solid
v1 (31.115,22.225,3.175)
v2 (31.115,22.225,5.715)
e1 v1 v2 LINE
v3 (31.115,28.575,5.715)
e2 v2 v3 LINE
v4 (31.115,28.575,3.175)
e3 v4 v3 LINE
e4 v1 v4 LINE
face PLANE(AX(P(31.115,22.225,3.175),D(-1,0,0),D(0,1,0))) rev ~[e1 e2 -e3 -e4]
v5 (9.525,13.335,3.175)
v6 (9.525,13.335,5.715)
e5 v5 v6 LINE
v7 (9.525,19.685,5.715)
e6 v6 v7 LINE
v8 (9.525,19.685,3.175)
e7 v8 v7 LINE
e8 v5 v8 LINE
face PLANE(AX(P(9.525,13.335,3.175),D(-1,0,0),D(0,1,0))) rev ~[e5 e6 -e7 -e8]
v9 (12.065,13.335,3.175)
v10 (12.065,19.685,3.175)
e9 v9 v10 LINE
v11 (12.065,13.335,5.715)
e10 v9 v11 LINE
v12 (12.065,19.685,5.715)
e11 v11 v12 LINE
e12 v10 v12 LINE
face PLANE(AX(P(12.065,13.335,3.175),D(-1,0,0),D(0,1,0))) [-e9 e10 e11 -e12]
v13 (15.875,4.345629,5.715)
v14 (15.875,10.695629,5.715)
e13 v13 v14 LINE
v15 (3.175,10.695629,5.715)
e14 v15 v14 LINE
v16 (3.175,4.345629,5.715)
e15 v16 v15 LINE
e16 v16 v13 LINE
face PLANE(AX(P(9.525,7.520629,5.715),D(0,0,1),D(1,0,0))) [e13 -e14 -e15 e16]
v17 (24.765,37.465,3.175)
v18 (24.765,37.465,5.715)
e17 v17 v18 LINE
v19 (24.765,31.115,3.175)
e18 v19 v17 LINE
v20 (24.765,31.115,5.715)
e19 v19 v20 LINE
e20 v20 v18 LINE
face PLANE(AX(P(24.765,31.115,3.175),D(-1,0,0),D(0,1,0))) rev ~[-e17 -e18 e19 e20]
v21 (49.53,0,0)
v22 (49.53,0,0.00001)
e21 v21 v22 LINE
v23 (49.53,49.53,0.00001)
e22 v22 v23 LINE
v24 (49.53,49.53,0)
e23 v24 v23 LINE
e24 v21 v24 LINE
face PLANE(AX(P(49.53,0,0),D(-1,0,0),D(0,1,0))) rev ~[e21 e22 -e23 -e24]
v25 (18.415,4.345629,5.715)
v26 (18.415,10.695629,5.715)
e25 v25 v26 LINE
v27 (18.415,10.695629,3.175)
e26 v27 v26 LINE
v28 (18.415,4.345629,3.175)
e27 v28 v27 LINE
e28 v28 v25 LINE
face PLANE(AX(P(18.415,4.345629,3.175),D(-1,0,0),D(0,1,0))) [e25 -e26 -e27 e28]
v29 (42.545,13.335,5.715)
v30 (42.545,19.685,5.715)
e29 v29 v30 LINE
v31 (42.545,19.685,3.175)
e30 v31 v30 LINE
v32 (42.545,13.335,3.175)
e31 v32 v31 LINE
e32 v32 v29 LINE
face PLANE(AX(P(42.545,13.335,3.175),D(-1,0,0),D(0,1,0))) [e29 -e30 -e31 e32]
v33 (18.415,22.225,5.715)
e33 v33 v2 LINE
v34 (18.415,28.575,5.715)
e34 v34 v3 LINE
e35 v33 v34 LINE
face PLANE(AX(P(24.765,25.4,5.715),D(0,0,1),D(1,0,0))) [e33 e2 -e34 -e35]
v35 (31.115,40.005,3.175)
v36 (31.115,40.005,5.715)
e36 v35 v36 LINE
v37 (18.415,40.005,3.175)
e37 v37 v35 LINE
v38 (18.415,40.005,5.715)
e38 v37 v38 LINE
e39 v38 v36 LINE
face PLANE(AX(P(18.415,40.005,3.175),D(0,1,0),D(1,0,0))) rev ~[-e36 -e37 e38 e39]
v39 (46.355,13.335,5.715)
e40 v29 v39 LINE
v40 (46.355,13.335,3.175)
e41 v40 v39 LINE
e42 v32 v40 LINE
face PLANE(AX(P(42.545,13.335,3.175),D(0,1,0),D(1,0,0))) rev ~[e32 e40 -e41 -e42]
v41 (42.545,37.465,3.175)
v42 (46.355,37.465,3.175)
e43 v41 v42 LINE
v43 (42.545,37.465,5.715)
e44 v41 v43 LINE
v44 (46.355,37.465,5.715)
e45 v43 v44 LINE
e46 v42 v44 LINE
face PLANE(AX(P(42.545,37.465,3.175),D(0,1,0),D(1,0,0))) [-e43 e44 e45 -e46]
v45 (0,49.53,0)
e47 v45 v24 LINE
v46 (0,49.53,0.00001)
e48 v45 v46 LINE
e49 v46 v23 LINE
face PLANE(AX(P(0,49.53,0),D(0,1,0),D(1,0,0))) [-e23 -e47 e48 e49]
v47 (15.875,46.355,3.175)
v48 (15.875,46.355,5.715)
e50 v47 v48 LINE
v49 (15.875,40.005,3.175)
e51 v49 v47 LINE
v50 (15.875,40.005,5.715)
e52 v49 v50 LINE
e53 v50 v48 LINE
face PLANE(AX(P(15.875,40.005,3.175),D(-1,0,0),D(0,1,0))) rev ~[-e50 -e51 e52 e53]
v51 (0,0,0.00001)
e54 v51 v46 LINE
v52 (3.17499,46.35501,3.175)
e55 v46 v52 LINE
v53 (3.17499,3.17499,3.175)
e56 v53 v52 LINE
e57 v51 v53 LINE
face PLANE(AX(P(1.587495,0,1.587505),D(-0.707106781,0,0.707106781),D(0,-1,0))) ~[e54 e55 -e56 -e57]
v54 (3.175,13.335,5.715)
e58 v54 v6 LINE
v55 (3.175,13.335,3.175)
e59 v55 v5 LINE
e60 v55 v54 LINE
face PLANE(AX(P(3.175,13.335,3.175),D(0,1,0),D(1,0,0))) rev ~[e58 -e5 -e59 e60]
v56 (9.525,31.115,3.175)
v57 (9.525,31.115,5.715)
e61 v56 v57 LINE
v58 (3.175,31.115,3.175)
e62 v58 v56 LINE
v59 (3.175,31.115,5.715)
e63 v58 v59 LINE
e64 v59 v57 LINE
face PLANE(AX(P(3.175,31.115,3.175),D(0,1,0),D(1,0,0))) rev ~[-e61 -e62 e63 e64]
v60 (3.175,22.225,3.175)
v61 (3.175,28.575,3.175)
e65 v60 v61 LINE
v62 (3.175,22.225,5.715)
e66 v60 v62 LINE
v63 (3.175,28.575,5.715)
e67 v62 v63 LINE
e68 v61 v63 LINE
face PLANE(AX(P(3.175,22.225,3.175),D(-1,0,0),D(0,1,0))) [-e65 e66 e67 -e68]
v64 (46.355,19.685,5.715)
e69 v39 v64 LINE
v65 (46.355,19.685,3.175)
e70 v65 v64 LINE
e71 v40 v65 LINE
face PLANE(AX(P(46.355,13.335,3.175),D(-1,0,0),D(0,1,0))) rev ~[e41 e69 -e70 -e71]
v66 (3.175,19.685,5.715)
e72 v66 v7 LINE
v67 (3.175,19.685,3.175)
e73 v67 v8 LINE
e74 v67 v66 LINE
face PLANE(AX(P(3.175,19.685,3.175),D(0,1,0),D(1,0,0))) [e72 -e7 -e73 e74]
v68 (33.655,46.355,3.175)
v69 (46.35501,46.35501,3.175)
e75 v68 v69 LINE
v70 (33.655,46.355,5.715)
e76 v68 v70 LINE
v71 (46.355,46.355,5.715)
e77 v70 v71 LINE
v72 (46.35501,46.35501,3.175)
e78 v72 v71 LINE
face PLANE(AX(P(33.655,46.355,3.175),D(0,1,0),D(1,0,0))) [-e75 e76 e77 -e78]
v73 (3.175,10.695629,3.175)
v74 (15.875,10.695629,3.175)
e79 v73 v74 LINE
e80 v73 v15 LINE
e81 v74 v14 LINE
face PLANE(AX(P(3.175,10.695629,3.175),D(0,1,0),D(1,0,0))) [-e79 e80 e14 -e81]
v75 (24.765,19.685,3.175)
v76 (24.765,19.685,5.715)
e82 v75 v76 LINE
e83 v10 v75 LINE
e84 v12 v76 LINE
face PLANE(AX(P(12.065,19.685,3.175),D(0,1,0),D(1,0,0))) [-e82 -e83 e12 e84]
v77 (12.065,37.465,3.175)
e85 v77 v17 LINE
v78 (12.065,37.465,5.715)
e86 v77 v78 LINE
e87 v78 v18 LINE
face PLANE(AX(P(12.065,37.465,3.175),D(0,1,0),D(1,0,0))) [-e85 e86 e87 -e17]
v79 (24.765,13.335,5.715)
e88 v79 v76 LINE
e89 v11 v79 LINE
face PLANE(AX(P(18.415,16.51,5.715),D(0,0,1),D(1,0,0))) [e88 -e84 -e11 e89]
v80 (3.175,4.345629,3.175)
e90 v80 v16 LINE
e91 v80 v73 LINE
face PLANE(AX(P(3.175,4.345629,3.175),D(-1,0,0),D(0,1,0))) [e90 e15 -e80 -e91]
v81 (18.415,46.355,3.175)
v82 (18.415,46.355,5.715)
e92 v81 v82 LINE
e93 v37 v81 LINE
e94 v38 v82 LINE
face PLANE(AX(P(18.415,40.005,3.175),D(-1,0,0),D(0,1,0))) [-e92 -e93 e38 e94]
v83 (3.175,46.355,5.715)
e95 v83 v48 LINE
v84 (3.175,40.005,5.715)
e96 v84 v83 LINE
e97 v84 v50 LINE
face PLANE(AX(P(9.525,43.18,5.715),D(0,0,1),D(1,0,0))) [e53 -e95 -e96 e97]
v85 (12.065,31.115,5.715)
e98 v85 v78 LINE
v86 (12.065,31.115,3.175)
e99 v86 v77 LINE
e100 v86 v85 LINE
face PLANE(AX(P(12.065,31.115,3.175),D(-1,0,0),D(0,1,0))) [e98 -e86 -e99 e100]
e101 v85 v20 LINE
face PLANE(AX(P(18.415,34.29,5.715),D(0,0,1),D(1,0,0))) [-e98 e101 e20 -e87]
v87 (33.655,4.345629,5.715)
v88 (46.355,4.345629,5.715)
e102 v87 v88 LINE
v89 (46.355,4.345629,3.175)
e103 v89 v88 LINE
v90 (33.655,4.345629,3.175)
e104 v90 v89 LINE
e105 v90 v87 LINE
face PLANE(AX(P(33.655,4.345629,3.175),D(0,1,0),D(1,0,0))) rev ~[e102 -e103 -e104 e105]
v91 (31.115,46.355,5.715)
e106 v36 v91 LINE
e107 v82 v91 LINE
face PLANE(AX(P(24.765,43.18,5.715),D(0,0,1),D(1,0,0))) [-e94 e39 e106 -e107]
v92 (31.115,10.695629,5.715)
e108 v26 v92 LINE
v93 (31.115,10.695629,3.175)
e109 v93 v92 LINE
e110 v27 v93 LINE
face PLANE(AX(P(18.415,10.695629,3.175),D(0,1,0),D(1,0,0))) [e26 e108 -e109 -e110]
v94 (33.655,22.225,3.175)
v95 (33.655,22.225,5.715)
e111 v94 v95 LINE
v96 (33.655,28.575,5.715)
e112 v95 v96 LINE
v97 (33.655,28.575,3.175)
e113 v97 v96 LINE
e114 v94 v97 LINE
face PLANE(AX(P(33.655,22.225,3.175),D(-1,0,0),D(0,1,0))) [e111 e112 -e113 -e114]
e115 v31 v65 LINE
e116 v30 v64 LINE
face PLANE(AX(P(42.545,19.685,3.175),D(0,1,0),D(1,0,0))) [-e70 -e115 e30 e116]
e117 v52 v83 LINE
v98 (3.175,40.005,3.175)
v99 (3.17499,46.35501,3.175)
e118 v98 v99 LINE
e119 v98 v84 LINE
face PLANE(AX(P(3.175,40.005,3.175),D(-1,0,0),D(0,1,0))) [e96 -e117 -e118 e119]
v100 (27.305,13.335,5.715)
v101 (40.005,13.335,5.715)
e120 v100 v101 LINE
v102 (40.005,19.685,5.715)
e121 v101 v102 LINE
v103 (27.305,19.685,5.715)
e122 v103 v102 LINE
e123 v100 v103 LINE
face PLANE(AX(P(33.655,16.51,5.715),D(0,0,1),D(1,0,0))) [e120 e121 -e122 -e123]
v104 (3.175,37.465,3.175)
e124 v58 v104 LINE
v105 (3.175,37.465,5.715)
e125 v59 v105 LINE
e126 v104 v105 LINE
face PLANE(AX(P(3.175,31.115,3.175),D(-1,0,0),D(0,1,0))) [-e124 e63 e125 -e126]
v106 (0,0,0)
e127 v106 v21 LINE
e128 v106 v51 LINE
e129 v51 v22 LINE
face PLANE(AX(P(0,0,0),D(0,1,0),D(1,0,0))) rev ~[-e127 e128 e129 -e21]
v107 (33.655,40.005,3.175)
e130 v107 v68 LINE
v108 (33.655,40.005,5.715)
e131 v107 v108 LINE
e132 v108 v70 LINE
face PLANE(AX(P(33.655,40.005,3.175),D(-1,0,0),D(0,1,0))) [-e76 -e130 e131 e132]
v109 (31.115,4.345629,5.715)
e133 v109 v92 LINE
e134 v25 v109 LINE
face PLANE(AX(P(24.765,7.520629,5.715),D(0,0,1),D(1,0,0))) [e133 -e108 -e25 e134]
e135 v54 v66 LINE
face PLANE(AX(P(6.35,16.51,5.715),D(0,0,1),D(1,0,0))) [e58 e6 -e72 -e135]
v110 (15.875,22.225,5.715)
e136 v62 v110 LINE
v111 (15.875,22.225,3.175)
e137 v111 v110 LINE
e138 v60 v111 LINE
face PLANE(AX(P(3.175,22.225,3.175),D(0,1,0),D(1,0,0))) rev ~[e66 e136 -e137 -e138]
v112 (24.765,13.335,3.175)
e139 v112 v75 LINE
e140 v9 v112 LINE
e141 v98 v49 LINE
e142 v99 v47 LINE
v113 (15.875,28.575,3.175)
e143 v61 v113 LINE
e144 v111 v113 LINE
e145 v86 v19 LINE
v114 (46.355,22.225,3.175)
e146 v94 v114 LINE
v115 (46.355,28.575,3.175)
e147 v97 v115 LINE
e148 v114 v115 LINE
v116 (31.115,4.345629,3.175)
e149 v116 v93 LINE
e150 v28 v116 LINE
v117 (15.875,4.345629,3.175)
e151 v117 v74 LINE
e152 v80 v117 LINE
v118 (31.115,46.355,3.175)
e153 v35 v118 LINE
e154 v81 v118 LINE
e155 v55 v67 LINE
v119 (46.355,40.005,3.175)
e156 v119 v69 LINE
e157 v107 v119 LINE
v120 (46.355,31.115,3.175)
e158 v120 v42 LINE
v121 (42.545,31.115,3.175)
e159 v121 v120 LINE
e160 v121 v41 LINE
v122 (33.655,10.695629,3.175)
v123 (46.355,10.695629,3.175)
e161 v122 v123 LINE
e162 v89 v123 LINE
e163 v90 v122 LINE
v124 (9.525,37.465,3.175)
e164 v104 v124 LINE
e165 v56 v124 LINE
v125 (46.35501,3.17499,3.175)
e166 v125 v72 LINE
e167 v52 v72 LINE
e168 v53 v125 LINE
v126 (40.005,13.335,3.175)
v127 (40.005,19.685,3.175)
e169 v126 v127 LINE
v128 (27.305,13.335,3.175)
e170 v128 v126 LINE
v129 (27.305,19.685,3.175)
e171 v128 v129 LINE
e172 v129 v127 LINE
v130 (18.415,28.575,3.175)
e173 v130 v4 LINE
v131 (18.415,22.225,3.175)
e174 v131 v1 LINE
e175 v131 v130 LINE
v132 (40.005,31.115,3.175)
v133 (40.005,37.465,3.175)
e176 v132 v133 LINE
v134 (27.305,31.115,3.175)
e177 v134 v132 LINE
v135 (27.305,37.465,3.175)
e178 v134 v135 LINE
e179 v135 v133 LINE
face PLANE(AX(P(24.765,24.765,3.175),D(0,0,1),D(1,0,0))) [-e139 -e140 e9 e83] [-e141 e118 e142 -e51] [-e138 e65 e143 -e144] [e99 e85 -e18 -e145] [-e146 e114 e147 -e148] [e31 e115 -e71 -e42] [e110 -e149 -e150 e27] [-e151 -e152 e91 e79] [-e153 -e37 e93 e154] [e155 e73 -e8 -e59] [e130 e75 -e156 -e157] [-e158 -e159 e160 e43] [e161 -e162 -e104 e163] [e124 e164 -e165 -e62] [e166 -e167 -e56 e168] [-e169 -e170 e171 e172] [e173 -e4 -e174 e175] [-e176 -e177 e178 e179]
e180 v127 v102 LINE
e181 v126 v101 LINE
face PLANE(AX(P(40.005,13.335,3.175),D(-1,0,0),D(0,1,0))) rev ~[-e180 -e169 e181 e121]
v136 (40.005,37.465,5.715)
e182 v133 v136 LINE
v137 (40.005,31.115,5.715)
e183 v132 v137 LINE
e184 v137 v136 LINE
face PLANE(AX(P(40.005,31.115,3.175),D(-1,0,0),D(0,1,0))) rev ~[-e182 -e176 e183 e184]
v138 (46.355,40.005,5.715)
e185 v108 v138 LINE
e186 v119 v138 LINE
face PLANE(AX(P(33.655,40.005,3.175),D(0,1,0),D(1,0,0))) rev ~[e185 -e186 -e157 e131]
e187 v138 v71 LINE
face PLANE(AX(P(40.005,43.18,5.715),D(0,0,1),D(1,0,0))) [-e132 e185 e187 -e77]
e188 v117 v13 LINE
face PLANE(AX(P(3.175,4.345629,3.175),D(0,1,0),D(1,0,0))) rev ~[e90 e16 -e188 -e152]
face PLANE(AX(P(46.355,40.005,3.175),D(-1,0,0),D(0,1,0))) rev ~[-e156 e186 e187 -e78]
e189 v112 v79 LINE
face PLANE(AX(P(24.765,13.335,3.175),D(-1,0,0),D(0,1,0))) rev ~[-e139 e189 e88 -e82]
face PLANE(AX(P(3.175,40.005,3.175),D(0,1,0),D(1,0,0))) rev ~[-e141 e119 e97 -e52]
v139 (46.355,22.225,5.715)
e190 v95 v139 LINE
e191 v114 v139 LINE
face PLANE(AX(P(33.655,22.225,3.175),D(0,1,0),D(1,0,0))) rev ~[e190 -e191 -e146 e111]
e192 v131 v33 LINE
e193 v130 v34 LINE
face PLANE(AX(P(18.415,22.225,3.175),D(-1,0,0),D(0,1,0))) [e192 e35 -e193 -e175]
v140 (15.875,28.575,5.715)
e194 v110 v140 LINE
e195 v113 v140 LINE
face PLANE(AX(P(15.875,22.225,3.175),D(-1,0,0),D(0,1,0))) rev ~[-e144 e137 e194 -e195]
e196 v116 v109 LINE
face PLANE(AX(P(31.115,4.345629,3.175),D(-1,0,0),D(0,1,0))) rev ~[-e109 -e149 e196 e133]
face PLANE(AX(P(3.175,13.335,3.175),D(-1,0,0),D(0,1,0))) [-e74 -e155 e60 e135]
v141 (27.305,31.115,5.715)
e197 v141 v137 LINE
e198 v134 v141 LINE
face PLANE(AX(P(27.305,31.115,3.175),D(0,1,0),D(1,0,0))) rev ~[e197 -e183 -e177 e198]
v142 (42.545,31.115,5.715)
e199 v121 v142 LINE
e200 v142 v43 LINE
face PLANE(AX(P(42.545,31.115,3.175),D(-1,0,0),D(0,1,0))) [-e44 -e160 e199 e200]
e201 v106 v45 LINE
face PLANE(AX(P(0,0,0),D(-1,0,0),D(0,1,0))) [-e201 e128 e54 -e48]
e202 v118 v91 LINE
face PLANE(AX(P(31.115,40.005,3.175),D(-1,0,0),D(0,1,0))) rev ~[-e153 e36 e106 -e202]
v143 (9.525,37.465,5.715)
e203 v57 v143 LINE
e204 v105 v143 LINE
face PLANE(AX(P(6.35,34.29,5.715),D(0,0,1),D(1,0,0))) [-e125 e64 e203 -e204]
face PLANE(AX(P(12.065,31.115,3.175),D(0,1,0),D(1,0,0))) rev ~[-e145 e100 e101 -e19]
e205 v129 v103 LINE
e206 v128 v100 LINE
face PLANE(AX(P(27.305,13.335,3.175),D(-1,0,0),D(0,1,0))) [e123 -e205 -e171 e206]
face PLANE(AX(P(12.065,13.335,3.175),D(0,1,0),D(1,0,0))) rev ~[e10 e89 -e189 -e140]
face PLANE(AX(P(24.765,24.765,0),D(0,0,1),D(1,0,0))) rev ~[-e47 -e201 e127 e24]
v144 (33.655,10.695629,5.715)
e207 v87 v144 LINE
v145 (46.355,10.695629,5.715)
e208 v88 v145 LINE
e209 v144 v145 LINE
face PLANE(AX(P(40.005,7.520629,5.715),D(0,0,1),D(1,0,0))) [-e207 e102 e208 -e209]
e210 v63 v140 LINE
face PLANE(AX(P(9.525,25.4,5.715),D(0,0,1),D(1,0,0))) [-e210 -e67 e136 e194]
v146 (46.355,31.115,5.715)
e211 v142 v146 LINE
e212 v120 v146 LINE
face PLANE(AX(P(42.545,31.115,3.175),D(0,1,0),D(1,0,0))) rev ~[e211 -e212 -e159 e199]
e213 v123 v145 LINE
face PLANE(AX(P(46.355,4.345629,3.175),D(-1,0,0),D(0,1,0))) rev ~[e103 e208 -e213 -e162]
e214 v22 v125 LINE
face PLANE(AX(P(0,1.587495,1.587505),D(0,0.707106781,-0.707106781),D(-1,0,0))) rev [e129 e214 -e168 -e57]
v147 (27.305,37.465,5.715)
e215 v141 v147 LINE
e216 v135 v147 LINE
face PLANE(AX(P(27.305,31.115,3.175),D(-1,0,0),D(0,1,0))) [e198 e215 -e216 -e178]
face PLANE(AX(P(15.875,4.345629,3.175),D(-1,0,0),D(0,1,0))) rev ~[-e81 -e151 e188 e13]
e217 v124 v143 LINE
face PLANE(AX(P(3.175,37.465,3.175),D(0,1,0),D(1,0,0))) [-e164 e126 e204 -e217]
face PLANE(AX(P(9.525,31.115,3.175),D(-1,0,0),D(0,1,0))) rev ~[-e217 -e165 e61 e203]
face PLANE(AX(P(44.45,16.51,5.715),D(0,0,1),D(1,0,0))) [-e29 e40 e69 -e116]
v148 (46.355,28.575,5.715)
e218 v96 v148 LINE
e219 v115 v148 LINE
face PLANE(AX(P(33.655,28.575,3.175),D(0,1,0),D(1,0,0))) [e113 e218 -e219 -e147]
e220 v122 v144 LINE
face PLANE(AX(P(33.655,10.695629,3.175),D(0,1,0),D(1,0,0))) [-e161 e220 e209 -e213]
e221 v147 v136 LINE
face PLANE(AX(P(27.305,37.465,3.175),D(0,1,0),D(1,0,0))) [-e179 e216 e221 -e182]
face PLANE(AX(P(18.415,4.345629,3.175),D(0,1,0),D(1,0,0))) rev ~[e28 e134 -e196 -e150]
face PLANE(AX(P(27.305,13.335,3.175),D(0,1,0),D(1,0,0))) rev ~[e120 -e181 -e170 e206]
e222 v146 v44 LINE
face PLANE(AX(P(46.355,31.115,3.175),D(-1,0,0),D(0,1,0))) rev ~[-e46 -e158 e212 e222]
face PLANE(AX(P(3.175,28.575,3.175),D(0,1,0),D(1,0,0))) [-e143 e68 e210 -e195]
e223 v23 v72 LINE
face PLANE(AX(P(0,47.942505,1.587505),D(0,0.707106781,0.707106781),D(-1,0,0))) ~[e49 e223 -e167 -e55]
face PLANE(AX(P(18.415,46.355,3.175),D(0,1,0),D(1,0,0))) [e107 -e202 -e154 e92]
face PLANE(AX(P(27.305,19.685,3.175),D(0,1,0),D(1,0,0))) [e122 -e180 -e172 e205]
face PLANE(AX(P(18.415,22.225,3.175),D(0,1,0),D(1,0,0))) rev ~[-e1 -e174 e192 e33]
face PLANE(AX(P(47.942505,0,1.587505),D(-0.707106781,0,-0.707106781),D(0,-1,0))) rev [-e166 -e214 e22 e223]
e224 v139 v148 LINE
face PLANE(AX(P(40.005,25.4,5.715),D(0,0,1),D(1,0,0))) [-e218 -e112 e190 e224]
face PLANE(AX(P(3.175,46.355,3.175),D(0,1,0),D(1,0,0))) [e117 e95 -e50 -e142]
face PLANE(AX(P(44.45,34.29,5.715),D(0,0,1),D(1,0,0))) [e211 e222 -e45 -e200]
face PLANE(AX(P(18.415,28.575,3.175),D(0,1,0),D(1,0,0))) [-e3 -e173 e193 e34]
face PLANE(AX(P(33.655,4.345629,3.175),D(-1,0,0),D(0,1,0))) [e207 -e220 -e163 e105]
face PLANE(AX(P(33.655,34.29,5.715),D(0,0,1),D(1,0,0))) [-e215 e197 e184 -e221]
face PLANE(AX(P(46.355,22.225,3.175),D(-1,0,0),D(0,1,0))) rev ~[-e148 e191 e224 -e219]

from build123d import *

# Parameters (mm, degrees)
F0_W     = 49.53
F0_H     = 49.53
F1_DEPTH = 3.175
F2_SIZE  = 3.17499
F3_W     = 3.81
F3_H     = 6.35
F3_W_2   = 12.7
F3_W_3   = 6.35
F3_W_4   = 12.7000000036
F3_W_5   = 3.8100000384
F3_W_6   = 12.7000000384
F4_DEPTH = 2.54


# Not quite as in the source:
# - a fillet or chamfer is up to 0.001 mm smaller than in the source, because OpenCascade refuses the exact size


with BuildPart() as f1:
    # F0 (on Top) → F1 (new body)
    with BuildSketch(Plane.XY):
        with Locations((24.765, 24.765)):
            Rectangle(F0_W, F0_H)
    extrude(amount=F1_DEPTH)

    # F2 (size 3.175 in the source; OpenCascade refuses exactly that, so slightly less here)
    f2_edges = [f1.edges().sort_by_distance(p)[0] for p in [
        (0, 24.765, 3.175),
        (24.765, 0, 3.175),
        (49.53, 24.765, 3.175),
        (24.765, 49.53, 3.175),
    ]]
    chamfer(f2_edges, length=F2_SIZE)

    # F3 (on face) → F4 (join)
    with BuildSketch(Plane.XY.offset(3.175)):
        with Locations((44.45, 34.29)):
            Rectangle(F3_W, F3_H)
        with Locations((9.525, 43.18)):
            Rectangle(F3_W_2, F3_H)
        with Locations((9.5249999653, 25.4)):
            Rectangle(F3_W_2, F3_H)
        with Locations((24.765, 43.18)):
            Rectangle(F3_W_2, F3_H)
        with Locations((6.3499999653, 16.51)):
            Rectangle(F3_W_3, F3_H)
        with Locations((40.005, 43.18)):
            Rectangle(F3_W_2, F3_H)
        with Locations((33.6549999616, 16.51)):
            Rectangle(F3_W_2, F3_H)
        with Locations((9.525, 7.5206288218)):
            Rectangle(F3_W_2, F3_H)
        with Locations((6.35, 34.29)):
            Rectangle(F3_W_3, F3_H)
        with Locations((24.7649999653, 25.4)):
            Rectangle(F3_W_2, F3_H)
        with Locations((40.0049999982, 7.5206288218)):
            Rectangle(F3_W_4, F3_H)
        with Locations((18.415, 34.29)):
            Rectangle(F3_W_2, F3_H)
        with Locations((18.4149999616, 16.51)):
            Rectangle(F3_W_2, F3_H)
        with Locations((44.4499999808, 16.51)):
            Rectangle(F3_W_5, F3_H)
        with Locations((33.655, 34.29)):
            Rectangle(F3_W_2, F3_H)
        with Locations((40.0049999808, 25.4)):
            Rectangle(F3_W_6, F3_H)
        with Locations((24.765, 7.5206288218)):
            Rectangle(F3_W_2, F3_H)
    extrude(amount=F4_DEPTH)


solid = f1.part
